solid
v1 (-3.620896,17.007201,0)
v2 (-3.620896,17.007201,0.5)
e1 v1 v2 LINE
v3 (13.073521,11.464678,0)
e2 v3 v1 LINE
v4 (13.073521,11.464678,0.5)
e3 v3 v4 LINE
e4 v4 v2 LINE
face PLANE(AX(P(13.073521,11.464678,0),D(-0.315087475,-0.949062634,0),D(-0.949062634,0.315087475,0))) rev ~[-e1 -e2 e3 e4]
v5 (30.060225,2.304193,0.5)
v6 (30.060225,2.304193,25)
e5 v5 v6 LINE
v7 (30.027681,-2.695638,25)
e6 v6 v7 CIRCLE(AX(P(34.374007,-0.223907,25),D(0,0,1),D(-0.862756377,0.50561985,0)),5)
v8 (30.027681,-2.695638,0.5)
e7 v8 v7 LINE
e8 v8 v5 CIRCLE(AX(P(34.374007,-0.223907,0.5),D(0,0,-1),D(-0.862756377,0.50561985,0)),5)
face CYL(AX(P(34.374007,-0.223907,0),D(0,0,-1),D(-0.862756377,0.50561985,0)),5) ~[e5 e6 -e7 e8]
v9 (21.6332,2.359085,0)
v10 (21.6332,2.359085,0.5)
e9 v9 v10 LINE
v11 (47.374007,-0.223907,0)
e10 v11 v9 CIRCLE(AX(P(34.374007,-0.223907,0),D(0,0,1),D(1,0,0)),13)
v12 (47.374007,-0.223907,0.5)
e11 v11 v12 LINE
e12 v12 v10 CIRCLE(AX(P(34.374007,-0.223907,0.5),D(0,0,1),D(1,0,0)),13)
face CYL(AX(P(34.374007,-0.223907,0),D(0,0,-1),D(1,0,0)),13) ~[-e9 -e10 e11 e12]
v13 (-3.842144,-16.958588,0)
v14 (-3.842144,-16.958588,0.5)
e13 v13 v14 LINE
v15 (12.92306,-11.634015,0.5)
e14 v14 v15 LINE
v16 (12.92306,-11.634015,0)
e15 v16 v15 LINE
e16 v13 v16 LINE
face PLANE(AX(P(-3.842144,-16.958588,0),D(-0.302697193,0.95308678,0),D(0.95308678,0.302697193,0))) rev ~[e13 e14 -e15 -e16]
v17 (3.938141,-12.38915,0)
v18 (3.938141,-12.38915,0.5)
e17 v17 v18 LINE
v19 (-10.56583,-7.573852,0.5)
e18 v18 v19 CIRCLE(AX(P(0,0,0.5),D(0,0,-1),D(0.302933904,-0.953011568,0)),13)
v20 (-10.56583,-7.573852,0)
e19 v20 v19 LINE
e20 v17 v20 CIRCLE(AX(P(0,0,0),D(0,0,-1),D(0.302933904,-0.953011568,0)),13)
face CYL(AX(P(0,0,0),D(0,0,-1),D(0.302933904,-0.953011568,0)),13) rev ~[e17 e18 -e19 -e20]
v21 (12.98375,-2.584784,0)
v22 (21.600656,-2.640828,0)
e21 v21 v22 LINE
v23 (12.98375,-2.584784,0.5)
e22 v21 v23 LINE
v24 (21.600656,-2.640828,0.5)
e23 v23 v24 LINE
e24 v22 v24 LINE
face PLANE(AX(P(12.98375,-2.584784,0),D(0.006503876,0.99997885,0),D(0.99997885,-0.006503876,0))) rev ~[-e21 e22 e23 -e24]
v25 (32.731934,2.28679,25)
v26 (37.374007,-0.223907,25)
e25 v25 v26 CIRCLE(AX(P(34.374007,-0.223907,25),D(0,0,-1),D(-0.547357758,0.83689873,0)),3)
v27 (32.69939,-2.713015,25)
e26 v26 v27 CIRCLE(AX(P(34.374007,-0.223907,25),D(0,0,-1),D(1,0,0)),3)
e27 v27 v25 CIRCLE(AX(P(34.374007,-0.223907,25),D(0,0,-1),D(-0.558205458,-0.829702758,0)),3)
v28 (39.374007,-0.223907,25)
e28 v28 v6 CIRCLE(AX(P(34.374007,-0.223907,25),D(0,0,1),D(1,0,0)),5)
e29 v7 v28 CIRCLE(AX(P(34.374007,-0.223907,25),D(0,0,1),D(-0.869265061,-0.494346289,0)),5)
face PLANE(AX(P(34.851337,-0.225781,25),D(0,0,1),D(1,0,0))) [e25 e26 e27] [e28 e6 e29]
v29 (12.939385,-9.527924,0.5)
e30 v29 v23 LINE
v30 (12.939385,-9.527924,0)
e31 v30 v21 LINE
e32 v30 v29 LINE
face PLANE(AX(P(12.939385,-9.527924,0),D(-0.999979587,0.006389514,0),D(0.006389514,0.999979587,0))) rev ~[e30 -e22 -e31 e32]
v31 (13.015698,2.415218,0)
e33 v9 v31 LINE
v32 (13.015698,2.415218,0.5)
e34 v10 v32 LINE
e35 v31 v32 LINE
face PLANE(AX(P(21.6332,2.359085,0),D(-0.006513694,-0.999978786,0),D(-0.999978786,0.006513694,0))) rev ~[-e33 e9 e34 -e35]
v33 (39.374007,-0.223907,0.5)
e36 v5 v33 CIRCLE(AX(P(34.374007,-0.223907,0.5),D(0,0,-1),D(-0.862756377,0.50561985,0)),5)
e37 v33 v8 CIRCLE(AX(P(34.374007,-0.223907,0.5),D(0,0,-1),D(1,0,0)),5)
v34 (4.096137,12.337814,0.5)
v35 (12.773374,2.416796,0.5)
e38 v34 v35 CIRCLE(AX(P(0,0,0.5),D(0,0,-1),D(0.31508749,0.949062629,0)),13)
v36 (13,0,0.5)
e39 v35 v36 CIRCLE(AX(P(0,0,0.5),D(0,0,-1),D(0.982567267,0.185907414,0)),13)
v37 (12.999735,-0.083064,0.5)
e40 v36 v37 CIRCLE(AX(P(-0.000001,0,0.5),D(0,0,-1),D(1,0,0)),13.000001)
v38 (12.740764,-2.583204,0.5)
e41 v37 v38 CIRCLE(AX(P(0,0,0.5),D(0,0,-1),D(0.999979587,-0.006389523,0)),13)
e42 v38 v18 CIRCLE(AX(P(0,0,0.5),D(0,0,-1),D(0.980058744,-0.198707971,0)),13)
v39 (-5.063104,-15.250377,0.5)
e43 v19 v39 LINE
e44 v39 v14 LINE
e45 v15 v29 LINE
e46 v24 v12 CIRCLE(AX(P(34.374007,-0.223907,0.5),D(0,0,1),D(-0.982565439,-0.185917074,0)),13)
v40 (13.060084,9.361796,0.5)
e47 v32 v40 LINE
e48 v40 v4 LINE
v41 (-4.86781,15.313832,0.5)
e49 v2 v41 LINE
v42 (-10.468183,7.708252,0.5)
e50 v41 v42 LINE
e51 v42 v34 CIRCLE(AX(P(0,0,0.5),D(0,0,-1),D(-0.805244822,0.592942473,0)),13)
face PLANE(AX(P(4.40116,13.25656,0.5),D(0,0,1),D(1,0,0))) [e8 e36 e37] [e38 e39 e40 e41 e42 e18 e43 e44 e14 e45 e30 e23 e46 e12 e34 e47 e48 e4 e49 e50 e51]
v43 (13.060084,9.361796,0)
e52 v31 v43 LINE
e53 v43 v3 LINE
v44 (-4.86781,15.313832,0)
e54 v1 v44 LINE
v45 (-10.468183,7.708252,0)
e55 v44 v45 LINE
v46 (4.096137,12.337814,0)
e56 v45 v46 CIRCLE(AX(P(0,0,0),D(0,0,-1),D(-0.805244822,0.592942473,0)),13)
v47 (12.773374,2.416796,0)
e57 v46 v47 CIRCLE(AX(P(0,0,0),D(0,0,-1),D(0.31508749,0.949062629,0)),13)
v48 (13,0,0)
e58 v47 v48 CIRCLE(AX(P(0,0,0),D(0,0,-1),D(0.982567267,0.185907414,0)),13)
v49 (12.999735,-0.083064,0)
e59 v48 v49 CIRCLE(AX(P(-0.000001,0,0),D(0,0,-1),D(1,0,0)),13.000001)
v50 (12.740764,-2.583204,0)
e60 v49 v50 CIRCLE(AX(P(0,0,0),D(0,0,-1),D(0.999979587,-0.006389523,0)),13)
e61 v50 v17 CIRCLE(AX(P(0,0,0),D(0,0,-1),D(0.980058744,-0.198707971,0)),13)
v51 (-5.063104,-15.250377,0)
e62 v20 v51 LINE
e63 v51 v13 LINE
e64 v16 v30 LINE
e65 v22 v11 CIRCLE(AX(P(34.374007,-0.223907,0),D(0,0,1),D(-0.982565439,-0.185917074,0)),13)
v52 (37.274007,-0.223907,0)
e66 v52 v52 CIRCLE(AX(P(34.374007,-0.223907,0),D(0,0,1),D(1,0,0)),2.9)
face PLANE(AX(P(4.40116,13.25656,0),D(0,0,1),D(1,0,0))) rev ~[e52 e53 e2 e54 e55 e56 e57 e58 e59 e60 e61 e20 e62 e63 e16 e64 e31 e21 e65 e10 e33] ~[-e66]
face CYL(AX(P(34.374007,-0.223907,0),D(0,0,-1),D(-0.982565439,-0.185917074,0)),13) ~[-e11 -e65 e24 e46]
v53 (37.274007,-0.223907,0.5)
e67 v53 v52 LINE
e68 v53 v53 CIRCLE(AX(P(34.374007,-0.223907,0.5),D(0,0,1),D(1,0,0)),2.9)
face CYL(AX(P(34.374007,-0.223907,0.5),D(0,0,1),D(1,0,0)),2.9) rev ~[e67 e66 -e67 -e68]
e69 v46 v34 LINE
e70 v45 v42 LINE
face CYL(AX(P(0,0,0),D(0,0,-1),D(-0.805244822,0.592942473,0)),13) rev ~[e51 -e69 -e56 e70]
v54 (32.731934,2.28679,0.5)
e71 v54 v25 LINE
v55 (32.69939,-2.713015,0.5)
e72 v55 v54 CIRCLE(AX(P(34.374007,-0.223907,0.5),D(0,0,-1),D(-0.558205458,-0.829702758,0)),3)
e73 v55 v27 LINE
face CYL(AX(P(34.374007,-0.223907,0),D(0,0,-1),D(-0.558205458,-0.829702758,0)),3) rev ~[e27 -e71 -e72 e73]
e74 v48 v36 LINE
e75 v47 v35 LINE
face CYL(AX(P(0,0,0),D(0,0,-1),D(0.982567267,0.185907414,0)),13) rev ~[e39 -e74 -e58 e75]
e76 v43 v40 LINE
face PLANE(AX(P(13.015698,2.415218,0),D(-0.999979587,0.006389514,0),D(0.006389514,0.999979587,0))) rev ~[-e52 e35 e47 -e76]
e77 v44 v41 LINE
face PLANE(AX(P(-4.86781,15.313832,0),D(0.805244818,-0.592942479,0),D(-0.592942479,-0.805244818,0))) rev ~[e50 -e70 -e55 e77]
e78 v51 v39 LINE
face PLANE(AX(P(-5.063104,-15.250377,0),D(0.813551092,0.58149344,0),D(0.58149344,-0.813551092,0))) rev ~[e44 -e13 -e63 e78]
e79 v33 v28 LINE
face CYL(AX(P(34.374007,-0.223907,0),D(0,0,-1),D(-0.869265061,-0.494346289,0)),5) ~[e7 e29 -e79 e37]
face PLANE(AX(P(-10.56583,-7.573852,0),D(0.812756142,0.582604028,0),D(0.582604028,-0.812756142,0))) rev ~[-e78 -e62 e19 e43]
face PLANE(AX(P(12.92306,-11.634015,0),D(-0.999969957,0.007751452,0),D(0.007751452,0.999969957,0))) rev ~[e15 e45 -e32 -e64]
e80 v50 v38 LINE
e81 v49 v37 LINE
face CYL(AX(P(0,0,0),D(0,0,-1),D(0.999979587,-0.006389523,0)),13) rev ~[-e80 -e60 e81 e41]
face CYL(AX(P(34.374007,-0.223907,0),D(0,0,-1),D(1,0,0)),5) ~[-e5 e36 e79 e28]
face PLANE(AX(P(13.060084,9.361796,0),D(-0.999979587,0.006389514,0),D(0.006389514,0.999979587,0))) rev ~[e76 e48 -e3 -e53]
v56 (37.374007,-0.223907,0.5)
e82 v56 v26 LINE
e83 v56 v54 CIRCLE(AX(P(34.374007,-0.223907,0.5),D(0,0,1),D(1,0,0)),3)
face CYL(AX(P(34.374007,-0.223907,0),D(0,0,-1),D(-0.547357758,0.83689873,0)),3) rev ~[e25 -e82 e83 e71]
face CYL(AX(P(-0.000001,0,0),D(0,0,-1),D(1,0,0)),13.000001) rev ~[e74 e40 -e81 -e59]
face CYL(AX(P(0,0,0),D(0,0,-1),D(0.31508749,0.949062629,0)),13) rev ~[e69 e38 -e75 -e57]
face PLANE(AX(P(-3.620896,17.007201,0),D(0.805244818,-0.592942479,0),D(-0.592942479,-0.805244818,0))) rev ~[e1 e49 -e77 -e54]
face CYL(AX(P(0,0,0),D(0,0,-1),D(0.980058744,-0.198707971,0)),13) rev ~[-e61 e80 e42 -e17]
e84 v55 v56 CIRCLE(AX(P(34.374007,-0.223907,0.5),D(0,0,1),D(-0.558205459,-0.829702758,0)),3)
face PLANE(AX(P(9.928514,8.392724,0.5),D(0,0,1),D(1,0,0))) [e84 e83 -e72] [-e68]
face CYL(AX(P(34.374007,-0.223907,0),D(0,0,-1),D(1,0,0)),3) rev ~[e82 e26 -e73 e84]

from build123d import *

# Parameters (mm, degrees)
F1_DEPTH = 0.5
F2_DEPTH = 25
F3_R     = 2.9
F4_DEPTH = 0.501
F6_DEPTH = 0.5


# Not quite as in the source:
# - a feature names something its author has since deleted; it is built from what else it names


with BuildPart() as f1:
    # F0 (on Top) → F1 (new body)
    with BuildSketch(Plane.XY):
        with BuildLine():
            Line((4.0961373656, 12.3378141776), (-4.8678095704, 15.3138321001))
            Line((-4.8678095704, 15.3138321001), (-10.4681826882, 7.7082521499))
            ThreePointArc((-10.4681826882, 7.7082521499), (-3.9381406197, 12.3891504333), (4.0961373656, 12.3378141776))
        make_face()
    extrude(amount=F1_DEPTH)



with BuildPart() as f1b:
    # F0 (on Top) → F1, piece 2 (new body)
    with BuildSketch(Plane.XY):
        with BuildLine():
            Line((13.0600839256, 9.36179638), (4.0961373656, 12.3378141776))
            ThreePointArc((4.0961373656, 12.3378141776), (9.7852826172, 8.5585188031), (12.7733744664, 2.41679638))
            Line((12.7733744664, 2.41679638), (13.01569776, 2.4152179267))
            Line((13.01569776, 2.4152179267), (13.0600839256, 9.36179638))
        make_face()
        with BuildLine():
            Line((13.01569776, 2.4152179267), (12.7733744664, 2.41679638))
            ThreePointArc((12.7733744664, 2.41679638), (12.9432196161, 1.2136992909), (13, 0))
            ThreePointArc((13, 0), (12.9999336569, -0.0415321088), (12.9997346283, -0.0830637936))
            Line((12.9997346283, -0.0830637936), (13.01569776, 2.4152179267))
        make_face()
        with BuildLine():
            Line((21.6332001204, 2.3590849609), (13.01569776, 2.4152179267))
            Line((13.01569776, 2.4152179267), (12.9997346283, -0.0830637936))
            Line((12.9997346283, -0.0830637936), (12.9837495259, -2.5847840032))
            Line((12.9837495259, -2.5847840032), (21.6006561013, -2.640828477))
            ThreePointArc((21.6006561013, -2.640828477), (21.374282177, -0.1392923959), (21.6332001204, 2.3590849609))
        make_face()
        with BuildLine():
            ThreePointArc((12.7407636764, -2.58320362), (9.6739656437, -8.6841458259), (3.9381407553, -12.3891503902))
            Line((3.9381407553, -12.3891503902), (12.9393853324, -9.5279237416))
            Line((12.9393853324, -9.5279237416), (12.9837495259, -2.5847840032))
            Line((12.9837495259, -2.5847840032), (12.7407636764, -2.58320362))
        make_face()
        with BuildLine():
            Line((12.9837495259, -2.5847840032), (12.9997346283, -0.0830637936))
            ThreePointArc((12.9997346283, -0.0830637936), (12.9308154434, -1.3394073199), (12.7407636764, -2.58320362))
            Line((12.7407636764, -2.58320362), (12.9837495259, -2.5847840032))
        make_face()
        with BuildLine():
            ThreePointArc((47.3740068068, -0.2239065181), (35.6719885241, 12.7111328503), (21.6332001204, 2.3590849609))
            Line((21.6332001204, 2.3590849609), (30.0602249194, 2.304192734))
            ThreePointArc((30.0602249194, 2.304192734), (35.6837950651, 4.6014903276), (39.3740068068, -0.2239065181))
            ThreePointArc((39.3740068068, -0.2239065181), (35.6523599398, -5.0577262569), (30.0276814999, -2.6956379611))
            Line((30.0276814999, -2.6956379611), (21.6006561013, -2.640828477))
            ThreePointArc((21.6006561013, -2.640828477), (35.5877697221, -13.1671201679), (47.3740068068, -0.2239065181))
        make_face()
        with BuildLine():
            Line((30.0602249194, 2.304192734), (21.6332001204, 2.3590849609))
            ThreePointArc((21.6332001204, 2.3590849609), (21.374282177, -0.1392923959), (21.6006561013, -2.640828477))
            Line((21.6006561013, -2.640828477), (30.0276814999, -2.6956379611))
            ThreePointArc((30.0276814999, -2.6956379611), (29.374112718, -0.1913626859), (30.0602249194, 2.304192734))
        make_face()
        with BuildLine():
            Line((32.7319335315, 2.286789672), (30.0602249194, 2.304192734))
            ThreePointArc((30.0602249194, 2.304192734), (29.374112718, -0.1913626859), (30.0276814999, -2.6956379611))
            Line((30.0276814999, -2.6956379611), (32.6993904313, -2.7130147911))
            ThreePointArc((32.6993904313, -2.7130147911), (31.3740703529, -0.2043803079), (32.7319335315, 2.286789672))
        make_face()
        with BuildLine():
            ThreePointArc((37.3740068068, -0.2239065181), (35.80120339, 2.4148640125), (32.7319335315, 2.286789672))
            Line((32.7319335315, 2.286789672), (34.3740068068, 2.2760934819))
            Line((34.3740068068, 2.2760934819), (34.3740068068, -2.7239065181))
            Line((34.3740068068, -2.7239065181), (32.6993904313, -2.7130147911))
            ThreePointArc((32.6993904313, -2.7130147911), (35.7839980964, -2.8719104009), (37.3740068068, -0.2239065181))
        make_face()
        with BuildLine():
            Line((34.3740068068, 2.2760934819), (32.7319335315, 2.286789672))
            ThreePointArc((32.7319335315, 2.286789672), (31.3740703529, -0.2043803079), (32.6993904313, -2.7130147911))
            Line((32.6993904313, -2.7130147911), (34.3740068068, -2.7239065181))
            Line((34.3740068068, -2.7239065181), (34.3740068068, 2.2760934819))
        make_face()
    extrude(amount=F1_DEPTH)

    # F0 (on Top) → F2 (join)
    with BuildSketch(Plane.XY):
        with BuildLine():
            ThreePointArc((39.3740068068, -0.2239065181), (35.6837950651, 4.6014903276), (30.0602249194, 2.304192734))
            Line((30.0602249194, 2.304192734), (32.7319335315, 2.286789672))
            ThreePointArc((32.7319335315, 2.286789672), (35.80120339, 2.4148640125), (37.3740068068, -0.2239065181))
            ThreePointArc((37.3740068068, -0.2239065181), (35.7839980964, -2.8719104009), (32.6993904313, -2.7130147911))
            Line((32.6993904313, -2.7130147911), (30.0276814999, -2.6956379611))
            ThreePointArc((30.0276814999, -2.6956379611), (35.6523599398, -5.0577262569), (39.3740068068, -0.2239065181))
        make_face()
        with BuildLine():
            Line((32.7319335315, 2.286789672), (30.0602249194, 2.304192734))
            ThreePointArc((30.0602249194, 2.304192734), (29.374112718, -0.1913626859), (30.0276814999, -2.6956379611))
            Line((30.0276814999, -2.6956379611), (32.6993904313, -2.7130147911))
            ThreePointArc((32.6993904313, -2.7130147911), (31.3740703529, -0.2043803079), (32.7319335315, 2.286789672))
        make_face()
    extrude(amount=F2_DEPTH)

    # F3 (on face) → F4 (cut, through all)
    with BuildSketch(Plane.XY.offset(0.5)):
        with Locations((34.3740068068, -0.2239065181)):
            Circle(F3_R)
    extrude(amount=-F4_DEPTH, mode=Mode.SUBTRACT)


with BuildPart() as f1c:
    # F0 (on Top) → F1, piece 3 (new body)
    with BuildSketch(Plane.XY):
        with BuildLine():
            ThreePointArc((3.9381407553, -12.3891503902), (-4.096137147, -12.3378142502), (-10.5658298597, -7.5738523471))
            Line((-10.5658298597, -7.5738523471), (-5.0631039967, -15.2503770945))
            Line((-5.0631039967, -15.2503770945), (3.9381407553, -12.3891503902))
        make_face()
    extrude(amount=F1_DEPTH)


with BuildPart() as f1_1:
    add(f1.part)

    add(f1b.part)  # F6 merges F1b

    add(f1c.part)  # F6 merges F1c
    # F5 (on face) → F6 (join, through all)
    with BuildSketch(Plane.XY):
        Polygon((-4.8678095704, 15.3138321001), (4.0961371776, 12.3378142401), (13.0600839256, 9.36179638), (13.0735205907, 11.4646779011), (-3.6208963346, 17.0072011144), align=None)
        Polygon((-5.0631039967, -15.2503770945), (-3.8421437919, -16.9585881221), (12.9230595755, -11.6340152664), (12.9393853324, -9.5279237416), (3.9381406679, -12.389150418), align=None)
    extrude(amount=F6_DEPTH)


solid = f1_1.part
